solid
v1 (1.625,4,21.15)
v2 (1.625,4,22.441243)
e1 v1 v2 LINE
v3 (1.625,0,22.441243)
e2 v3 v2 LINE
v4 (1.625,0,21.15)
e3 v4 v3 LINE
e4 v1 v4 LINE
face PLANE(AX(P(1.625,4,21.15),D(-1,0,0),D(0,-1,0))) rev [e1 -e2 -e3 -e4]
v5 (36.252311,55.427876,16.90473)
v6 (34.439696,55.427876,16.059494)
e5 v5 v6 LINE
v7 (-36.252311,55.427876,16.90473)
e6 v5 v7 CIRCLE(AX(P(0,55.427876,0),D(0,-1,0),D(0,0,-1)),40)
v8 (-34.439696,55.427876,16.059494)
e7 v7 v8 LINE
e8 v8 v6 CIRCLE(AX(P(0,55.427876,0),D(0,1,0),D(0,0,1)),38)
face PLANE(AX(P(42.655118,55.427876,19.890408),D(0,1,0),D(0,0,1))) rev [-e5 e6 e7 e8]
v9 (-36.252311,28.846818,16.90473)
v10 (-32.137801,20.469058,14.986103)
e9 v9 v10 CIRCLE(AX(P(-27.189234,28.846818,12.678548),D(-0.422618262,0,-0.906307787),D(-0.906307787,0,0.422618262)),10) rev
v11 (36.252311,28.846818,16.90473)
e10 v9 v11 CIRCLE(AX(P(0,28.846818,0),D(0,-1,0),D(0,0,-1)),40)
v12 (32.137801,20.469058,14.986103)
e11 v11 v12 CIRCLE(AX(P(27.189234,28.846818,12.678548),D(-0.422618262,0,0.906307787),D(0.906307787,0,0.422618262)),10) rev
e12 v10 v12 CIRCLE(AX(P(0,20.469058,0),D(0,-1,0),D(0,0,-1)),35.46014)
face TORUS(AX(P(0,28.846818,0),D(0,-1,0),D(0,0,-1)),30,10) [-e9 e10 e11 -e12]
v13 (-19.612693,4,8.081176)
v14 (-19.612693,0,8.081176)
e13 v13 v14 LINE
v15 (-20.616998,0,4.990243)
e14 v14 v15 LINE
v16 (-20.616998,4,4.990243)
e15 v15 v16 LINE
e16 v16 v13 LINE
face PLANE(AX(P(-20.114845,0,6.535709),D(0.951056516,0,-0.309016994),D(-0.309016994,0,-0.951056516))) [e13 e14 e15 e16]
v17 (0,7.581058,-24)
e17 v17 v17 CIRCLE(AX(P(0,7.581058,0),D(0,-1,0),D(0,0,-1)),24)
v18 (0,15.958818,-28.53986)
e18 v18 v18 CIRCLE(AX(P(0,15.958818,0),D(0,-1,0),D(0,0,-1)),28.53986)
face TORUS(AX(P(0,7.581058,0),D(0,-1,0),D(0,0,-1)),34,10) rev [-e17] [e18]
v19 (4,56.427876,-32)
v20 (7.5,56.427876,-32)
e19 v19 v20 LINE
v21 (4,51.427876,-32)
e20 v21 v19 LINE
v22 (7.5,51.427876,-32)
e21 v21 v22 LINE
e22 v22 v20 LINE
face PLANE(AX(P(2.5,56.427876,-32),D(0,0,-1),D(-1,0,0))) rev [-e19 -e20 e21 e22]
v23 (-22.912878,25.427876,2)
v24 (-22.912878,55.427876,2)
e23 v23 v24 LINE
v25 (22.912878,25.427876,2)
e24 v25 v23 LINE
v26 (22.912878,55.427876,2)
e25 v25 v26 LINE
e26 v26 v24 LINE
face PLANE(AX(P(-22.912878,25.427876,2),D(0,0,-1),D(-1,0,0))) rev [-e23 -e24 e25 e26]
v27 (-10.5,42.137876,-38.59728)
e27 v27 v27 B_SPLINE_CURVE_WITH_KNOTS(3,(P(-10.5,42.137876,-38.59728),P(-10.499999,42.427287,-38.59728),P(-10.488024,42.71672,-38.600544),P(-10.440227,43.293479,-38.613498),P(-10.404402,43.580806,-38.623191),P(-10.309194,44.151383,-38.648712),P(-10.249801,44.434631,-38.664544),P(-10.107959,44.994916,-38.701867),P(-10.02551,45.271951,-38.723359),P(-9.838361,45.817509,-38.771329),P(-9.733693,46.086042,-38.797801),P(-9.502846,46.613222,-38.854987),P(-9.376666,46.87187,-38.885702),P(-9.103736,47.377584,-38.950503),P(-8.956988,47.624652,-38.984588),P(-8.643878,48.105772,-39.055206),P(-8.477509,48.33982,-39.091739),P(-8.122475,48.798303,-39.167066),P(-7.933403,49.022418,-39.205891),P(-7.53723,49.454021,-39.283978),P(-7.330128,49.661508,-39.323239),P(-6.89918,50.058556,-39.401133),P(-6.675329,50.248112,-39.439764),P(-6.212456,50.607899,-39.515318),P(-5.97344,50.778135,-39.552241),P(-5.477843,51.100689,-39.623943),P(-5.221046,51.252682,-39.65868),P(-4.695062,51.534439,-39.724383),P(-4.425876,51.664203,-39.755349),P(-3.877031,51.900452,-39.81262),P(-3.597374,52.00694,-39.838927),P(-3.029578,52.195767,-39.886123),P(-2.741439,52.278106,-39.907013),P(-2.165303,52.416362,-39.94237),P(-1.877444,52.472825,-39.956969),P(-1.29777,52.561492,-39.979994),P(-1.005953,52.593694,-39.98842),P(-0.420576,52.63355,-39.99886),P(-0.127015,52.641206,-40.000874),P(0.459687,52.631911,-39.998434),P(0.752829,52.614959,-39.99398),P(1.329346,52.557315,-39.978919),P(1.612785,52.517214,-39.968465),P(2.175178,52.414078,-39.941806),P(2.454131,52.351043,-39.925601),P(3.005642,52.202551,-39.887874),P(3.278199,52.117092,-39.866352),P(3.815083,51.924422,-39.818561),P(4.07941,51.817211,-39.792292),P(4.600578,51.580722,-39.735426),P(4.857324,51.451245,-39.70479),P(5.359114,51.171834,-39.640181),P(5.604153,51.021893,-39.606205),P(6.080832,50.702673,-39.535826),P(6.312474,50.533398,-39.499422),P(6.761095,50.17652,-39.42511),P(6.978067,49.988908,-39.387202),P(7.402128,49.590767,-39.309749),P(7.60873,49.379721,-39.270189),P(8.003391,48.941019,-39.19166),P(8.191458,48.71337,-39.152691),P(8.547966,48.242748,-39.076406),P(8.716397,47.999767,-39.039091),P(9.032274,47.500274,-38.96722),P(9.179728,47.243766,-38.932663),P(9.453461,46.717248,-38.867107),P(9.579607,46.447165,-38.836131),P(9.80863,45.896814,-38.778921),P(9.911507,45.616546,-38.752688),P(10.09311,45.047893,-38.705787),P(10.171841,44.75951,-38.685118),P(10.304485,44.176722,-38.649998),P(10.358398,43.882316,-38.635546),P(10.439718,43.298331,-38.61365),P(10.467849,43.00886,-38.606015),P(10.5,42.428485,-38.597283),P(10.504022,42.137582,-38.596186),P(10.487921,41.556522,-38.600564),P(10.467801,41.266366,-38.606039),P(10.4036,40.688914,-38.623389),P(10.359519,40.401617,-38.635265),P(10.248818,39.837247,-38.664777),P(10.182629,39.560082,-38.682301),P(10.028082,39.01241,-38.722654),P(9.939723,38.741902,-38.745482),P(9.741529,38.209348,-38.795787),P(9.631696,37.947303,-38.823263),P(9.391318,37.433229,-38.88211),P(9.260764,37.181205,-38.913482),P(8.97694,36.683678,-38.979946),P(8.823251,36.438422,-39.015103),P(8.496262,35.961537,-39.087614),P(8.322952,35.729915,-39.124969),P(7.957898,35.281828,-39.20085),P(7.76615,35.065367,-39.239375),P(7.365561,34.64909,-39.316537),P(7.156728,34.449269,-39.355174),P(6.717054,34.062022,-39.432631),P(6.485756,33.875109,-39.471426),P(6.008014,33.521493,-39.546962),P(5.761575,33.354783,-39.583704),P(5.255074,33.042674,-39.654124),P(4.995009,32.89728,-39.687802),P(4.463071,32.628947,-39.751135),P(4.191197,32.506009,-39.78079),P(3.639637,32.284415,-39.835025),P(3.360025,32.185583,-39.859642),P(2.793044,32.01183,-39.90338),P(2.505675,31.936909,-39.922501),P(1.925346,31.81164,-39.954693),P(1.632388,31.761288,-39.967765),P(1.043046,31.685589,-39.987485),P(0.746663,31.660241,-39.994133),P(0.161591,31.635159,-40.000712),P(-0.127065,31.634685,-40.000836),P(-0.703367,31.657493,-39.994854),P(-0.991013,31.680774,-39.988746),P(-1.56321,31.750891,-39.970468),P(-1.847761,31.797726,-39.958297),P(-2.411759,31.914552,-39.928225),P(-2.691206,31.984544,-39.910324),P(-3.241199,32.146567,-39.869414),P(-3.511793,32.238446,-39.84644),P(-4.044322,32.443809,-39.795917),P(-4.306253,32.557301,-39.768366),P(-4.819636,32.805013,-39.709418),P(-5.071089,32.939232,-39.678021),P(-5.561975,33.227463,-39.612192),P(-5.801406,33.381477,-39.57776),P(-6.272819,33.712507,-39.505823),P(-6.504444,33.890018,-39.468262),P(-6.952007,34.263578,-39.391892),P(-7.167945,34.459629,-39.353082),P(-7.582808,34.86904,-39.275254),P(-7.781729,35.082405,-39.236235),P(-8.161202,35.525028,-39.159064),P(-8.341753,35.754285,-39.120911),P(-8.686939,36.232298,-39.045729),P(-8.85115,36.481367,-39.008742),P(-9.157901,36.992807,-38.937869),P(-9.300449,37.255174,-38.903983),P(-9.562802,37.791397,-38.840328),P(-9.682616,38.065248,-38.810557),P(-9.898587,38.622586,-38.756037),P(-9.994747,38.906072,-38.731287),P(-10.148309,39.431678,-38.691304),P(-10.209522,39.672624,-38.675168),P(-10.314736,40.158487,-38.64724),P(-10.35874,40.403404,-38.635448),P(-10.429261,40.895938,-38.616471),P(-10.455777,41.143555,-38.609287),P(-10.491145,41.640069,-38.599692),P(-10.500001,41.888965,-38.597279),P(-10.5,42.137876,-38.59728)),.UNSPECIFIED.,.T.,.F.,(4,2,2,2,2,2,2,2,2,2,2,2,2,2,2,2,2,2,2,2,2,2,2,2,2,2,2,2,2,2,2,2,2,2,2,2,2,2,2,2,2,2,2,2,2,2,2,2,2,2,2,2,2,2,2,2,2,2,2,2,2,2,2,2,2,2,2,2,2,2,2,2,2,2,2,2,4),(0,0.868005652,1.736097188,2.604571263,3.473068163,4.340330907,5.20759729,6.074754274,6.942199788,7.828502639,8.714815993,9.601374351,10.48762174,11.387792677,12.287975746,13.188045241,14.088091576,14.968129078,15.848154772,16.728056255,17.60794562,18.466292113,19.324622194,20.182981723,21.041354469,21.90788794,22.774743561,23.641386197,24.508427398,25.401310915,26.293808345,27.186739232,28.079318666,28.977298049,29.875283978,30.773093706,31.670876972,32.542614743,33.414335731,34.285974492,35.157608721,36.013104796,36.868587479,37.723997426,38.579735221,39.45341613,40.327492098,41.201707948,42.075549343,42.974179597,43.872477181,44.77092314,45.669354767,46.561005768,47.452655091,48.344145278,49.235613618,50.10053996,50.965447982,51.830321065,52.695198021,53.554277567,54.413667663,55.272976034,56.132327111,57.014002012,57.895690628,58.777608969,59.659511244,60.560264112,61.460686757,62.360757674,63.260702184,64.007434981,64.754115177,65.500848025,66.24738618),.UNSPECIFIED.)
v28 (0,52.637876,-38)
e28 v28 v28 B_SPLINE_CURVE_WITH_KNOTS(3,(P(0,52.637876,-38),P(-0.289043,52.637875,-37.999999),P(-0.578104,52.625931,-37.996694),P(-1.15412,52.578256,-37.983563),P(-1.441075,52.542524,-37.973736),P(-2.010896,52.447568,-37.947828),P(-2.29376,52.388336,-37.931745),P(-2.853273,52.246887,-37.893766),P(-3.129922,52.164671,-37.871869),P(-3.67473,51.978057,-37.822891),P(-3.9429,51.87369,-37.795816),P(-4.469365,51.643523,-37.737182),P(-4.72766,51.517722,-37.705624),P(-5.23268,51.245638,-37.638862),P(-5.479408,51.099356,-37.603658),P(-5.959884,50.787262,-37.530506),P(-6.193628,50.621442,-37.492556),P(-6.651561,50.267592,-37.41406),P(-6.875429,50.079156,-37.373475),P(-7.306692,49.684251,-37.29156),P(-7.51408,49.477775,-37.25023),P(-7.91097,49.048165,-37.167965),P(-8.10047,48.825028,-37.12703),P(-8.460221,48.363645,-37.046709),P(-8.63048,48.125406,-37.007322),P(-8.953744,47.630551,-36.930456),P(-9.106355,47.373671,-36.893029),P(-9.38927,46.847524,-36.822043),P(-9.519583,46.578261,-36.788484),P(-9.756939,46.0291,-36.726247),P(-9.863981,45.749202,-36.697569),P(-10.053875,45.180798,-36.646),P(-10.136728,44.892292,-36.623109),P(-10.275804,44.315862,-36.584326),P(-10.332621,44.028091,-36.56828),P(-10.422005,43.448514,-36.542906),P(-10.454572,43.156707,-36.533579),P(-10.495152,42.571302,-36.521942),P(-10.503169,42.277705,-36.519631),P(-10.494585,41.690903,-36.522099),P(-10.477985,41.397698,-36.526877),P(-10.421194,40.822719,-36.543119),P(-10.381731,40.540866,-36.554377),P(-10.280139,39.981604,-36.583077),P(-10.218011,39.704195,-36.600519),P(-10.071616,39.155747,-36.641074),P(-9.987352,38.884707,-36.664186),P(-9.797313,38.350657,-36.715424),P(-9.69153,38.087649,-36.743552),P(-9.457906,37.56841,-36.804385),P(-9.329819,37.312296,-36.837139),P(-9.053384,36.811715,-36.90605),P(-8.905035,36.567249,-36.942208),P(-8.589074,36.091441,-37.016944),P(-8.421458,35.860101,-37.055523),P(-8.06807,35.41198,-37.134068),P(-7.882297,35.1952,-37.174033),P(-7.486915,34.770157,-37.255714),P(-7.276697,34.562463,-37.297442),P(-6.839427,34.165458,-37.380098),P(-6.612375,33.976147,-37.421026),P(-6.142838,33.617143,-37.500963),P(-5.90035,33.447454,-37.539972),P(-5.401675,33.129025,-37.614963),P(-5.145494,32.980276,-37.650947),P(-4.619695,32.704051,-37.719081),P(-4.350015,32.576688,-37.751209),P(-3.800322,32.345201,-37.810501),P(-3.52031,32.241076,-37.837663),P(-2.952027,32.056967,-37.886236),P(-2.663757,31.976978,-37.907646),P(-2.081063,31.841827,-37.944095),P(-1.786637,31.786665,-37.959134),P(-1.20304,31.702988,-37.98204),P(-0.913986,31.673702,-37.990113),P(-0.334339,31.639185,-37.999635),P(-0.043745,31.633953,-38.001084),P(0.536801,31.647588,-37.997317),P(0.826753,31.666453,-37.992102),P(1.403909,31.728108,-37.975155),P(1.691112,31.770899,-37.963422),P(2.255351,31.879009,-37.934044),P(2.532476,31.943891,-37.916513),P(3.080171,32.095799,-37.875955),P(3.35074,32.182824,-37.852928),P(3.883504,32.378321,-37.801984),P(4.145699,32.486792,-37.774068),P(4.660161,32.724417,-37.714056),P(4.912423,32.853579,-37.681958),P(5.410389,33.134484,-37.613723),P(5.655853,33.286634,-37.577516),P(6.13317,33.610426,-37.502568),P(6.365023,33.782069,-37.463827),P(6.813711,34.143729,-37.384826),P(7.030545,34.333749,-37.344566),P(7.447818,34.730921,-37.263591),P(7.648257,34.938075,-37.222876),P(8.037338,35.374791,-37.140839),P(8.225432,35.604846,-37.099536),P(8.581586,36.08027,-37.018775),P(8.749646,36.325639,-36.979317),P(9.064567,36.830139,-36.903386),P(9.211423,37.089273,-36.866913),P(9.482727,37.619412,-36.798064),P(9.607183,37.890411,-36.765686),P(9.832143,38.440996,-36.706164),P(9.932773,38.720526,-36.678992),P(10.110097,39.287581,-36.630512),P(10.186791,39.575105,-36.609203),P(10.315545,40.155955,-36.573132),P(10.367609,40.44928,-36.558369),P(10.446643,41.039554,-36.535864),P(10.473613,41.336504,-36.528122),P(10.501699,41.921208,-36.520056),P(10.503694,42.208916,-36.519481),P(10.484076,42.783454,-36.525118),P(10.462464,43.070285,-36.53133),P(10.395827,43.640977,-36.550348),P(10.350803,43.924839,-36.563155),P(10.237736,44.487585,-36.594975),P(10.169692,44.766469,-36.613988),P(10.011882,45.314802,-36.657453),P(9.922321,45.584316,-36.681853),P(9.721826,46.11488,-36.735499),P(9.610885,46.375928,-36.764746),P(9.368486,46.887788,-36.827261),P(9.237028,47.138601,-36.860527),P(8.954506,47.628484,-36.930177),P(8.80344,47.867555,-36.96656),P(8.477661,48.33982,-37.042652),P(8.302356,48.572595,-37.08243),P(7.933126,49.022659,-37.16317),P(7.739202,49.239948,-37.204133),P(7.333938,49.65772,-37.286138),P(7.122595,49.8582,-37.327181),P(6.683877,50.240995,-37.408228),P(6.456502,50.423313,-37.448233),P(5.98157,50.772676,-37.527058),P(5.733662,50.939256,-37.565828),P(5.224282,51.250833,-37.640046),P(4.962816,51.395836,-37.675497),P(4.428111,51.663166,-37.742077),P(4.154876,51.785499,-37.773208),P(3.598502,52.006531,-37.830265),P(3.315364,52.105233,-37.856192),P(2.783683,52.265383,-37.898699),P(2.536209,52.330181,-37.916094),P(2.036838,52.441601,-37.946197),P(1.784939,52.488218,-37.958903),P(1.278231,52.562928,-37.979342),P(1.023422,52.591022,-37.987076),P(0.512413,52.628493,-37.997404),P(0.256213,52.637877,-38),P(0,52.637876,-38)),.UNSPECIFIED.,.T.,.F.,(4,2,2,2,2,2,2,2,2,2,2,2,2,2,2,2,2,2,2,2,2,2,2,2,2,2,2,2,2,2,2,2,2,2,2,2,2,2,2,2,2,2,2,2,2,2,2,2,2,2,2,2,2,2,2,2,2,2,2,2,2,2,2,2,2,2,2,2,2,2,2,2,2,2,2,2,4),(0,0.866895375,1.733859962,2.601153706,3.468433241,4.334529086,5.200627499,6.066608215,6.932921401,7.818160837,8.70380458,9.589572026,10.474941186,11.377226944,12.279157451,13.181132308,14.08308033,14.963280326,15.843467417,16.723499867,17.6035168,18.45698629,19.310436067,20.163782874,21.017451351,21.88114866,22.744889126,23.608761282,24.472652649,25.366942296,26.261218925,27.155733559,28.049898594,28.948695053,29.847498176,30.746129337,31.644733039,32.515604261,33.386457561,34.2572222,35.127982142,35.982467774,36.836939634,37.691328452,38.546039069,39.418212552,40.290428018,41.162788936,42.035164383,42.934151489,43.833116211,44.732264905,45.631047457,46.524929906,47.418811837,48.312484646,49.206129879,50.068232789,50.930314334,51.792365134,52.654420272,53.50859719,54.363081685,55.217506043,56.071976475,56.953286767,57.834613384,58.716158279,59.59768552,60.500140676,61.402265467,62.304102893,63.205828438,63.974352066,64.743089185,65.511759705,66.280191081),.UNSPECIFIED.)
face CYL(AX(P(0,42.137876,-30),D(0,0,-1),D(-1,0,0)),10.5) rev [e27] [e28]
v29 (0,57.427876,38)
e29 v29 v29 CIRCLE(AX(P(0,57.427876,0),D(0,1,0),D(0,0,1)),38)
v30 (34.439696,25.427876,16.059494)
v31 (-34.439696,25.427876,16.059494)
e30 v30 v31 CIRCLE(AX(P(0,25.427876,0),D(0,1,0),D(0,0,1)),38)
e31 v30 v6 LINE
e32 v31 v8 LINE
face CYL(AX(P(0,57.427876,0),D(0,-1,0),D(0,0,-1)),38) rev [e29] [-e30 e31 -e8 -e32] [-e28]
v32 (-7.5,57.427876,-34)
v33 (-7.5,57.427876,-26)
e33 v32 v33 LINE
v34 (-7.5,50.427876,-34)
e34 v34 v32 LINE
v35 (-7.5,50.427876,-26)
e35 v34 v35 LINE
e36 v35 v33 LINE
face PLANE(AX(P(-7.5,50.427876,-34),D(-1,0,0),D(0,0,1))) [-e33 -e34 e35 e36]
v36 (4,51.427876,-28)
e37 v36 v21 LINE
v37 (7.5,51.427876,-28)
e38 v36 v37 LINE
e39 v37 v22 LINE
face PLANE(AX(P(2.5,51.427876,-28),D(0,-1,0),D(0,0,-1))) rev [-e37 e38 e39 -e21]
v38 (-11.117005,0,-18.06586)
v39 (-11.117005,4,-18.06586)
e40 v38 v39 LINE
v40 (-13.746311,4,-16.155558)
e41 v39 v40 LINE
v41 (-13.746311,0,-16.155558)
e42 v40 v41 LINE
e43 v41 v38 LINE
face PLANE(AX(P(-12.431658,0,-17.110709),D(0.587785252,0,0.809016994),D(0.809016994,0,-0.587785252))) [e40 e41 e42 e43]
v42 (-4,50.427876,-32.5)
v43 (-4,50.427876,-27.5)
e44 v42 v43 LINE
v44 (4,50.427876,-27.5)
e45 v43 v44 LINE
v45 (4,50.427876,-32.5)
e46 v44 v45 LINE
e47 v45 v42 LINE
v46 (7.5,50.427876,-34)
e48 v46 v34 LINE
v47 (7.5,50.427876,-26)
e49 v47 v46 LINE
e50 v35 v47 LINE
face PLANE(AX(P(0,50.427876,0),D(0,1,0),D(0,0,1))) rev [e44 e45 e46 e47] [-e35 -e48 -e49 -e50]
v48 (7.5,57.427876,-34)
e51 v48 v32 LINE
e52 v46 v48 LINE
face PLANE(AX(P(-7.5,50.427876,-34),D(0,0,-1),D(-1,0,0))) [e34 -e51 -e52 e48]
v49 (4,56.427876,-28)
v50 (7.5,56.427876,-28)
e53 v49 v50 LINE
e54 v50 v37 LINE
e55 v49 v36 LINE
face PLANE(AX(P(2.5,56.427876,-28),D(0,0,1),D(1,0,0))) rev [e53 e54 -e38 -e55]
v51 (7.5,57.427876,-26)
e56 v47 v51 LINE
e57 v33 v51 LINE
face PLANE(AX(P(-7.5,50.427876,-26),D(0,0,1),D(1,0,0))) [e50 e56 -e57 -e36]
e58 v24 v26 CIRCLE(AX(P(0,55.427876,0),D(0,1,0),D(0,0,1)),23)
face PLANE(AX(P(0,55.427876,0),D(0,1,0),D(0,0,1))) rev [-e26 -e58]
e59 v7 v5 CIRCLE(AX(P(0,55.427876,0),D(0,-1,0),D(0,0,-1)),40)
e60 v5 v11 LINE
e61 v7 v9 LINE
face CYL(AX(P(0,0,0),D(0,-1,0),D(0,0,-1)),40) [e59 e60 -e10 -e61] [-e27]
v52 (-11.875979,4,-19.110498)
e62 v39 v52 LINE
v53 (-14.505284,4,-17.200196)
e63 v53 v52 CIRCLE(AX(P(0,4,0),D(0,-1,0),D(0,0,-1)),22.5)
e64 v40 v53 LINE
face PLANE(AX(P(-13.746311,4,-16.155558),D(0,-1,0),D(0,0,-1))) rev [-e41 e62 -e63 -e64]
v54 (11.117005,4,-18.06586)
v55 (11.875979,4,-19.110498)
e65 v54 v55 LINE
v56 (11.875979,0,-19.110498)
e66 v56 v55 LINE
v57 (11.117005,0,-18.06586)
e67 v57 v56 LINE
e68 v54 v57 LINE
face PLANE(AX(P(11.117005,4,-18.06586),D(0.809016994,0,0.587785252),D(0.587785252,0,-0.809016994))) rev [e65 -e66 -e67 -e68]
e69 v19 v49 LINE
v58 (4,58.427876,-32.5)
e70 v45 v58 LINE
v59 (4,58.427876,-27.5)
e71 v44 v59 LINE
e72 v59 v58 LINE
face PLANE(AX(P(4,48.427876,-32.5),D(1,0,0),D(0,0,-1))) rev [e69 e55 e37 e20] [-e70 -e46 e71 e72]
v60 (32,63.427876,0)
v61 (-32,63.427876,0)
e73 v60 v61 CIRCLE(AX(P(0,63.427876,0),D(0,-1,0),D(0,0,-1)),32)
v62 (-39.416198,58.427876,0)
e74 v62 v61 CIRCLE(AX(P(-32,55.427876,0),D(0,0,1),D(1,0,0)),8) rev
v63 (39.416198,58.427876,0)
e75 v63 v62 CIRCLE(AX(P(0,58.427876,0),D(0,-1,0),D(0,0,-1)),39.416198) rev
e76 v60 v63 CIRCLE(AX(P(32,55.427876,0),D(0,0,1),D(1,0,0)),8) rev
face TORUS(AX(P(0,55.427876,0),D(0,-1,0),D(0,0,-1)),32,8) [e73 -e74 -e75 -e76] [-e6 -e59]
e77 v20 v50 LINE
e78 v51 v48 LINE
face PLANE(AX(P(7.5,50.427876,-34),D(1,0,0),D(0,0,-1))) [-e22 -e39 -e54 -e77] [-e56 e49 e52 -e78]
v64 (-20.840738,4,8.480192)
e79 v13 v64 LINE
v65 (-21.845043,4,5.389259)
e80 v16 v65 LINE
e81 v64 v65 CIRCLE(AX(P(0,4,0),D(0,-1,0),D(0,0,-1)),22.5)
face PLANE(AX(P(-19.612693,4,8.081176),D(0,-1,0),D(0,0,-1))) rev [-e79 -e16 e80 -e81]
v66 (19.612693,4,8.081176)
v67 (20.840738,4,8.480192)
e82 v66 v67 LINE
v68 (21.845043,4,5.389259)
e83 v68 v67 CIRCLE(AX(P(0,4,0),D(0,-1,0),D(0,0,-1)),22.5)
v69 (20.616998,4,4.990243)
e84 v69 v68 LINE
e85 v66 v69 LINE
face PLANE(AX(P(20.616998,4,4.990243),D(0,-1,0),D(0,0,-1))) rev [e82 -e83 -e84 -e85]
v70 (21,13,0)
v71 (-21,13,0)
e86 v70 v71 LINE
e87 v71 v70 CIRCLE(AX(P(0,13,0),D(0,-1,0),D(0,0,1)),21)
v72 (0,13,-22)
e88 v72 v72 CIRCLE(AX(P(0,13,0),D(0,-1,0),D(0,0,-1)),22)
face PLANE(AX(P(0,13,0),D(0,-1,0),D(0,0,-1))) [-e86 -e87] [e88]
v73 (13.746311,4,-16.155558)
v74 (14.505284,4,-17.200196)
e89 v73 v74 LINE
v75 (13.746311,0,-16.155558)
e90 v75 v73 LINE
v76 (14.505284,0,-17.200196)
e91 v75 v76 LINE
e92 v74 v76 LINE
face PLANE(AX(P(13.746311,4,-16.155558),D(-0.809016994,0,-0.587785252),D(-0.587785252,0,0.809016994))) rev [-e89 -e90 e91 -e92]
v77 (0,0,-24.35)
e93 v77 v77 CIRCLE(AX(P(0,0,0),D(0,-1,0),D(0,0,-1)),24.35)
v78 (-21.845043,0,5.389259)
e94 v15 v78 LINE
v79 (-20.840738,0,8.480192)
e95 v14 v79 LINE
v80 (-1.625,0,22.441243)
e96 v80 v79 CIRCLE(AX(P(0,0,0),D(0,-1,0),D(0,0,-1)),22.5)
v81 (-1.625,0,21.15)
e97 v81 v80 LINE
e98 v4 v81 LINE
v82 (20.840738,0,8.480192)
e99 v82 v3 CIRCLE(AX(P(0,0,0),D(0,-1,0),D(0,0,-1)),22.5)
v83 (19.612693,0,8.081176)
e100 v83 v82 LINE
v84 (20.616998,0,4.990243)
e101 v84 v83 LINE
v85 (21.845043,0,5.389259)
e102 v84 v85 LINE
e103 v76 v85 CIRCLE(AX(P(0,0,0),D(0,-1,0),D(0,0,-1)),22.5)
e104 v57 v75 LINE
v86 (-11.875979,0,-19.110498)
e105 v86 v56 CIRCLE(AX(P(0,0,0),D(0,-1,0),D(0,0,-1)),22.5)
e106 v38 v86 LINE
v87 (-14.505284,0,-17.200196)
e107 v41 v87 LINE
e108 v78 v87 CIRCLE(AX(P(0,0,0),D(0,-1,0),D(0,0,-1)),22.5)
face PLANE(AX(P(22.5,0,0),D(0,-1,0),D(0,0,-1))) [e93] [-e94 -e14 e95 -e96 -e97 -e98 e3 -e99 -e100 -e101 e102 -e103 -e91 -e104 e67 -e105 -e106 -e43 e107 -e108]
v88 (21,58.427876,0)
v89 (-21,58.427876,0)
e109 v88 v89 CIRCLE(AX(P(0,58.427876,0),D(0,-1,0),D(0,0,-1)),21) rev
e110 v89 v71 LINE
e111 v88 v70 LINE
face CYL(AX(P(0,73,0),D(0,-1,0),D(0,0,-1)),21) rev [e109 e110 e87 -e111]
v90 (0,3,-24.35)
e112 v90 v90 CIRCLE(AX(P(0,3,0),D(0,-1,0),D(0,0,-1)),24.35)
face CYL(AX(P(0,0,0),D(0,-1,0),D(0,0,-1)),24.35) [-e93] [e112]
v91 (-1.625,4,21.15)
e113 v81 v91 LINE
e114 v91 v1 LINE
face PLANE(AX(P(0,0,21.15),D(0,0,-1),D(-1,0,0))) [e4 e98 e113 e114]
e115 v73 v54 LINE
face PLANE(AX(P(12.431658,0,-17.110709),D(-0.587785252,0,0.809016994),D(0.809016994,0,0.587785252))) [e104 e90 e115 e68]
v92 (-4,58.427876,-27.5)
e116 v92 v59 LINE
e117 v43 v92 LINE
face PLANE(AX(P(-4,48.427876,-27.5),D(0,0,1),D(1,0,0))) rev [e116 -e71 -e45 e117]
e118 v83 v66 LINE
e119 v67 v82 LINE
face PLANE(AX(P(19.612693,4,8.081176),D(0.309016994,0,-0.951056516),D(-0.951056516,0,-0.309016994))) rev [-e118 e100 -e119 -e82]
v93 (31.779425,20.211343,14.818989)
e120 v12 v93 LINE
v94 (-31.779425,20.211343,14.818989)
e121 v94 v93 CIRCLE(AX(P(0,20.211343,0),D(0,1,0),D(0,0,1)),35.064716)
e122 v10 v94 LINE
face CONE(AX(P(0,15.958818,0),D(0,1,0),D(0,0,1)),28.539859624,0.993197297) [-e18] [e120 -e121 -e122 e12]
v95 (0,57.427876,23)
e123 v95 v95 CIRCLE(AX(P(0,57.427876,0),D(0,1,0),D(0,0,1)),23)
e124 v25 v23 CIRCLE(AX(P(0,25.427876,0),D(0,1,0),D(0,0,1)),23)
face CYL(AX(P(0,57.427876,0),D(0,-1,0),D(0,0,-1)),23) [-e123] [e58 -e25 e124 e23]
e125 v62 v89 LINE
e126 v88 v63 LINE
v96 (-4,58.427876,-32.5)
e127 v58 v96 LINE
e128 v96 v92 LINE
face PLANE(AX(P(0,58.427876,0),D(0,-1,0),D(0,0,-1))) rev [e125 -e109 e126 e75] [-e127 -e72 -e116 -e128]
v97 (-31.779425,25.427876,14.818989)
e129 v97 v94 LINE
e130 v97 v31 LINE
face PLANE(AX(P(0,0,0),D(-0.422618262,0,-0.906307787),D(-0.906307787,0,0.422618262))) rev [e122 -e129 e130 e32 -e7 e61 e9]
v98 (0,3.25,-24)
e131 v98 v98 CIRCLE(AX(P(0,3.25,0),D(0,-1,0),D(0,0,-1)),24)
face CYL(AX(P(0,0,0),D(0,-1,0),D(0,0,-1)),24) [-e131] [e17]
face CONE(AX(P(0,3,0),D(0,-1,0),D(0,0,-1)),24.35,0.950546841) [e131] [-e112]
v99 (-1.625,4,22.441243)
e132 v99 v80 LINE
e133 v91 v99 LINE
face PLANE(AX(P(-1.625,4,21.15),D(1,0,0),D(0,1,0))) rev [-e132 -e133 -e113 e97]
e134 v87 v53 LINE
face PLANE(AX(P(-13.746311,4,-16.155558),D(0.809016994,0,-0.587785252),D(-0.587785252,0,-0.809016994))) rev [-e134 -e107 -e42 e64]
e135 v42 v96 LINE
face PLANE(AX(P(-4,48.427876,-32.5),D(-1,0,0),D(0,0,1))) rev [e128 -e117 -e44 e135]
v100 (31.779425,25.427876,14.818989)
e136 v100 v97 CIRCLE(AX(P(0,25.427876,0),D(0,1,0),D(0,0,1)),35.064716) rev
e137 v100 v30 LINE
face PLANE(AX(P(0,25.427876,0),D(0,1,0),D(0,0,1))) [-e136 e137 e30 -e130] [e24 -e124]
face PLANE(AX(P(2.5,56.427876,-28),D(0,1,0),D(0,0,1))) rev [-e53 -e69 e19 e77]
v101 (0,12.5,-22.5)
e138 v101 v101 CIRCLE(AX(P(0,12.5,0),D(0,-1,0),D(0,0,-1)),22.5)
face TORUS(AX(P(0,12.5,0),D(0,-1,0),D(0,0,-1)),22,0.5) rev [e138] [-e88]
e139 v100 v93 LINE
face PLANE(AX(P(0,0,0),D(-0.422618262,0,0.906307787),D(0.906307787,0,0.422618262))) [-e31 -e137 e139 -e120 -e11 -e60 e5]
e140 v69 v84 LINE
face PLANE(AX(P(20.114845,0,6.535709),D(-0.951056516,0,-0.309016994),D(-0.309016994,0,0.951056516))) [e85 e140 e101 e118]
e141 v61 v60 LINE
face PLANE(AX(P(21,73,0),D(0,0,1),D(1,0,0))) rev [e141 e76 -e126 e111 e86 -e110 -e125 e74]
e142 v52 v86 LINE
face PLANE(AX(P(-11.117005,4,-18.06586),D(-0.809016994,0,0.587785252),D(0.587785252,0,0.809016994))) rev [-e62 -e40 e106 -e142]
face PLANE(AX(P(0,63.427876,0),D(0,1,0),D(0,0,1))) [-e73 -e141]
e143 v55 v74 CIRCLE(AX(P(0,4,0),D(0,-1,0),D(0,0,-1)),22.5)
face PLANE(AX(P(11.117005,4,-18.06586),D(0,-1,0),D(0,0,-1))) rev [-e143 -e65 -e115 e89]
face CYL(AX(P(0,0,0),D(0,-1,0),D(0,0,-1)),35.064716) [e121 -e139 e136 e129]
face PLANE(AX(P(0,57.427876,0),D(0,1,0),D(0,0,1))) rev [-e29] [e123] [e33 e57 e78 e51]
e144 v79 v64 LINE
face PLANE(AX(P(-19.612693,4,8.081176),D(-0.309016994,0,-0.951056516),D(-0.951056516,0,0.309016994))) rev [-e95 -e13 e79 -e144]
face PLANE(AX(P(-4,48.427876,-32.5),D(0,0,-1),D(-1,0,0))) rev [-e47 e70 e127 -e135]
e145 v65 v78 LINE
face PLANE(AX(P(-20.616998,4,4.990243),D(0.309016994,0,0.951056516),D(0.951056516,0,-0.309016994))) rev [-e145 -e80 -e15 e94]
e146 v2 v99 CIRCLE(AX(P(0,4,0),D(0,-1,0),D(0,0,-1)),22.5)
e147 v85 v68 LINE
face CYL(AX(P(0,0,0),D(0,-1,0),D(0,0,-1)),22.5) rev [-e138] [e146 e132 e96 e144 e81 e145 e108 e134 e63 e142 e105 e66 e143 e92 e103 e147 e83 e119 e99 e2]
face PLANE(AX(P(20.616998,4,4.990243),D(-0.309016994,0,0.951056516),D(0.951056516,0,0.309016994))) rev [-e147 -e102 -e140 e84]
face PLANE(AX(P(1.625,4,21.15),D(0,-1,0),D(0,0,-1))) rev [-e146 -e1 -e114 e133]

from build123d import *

# Parameters (mm, degrees)
CUT_EXTRUDE3_DEPTH           = 60
CUT_EXTRUDE5_DEPTH           = 2
CUT_EXTRUDE5_DEPTH_BACK      = 30
SKETCH9_R                    = 38
SKETCH9_R_2                  = 23
SKETCH19_W                   = 12
SKETCH19_H                   = 36.5
CUT_REVOLVE2_ANGLE           = 65
CUT_REVOLVE2_OTHER_WAY_ANGLE = 65
SKETCH21_W                   = 3.25
SKETCH21_H                   = 4
BOSS_EXTRUDE3_DEPTH          = 1.35
CIRPATTERN1_COUNT            = 5
CUT_EXTRUDE9_START           = -5
CUT_EXTRUDE9_DEPTH           = 5
SKETCH23_R                   = 10.5
CUT_EXTRUDE10_DEPTH          = 10
SKETCH24_W                   = 15
SKETCH24_H                   = 8
BOSS_EXTRUDE4_DEPTH          = 8
SKETCH26_W                   = 8
SKETCH26_H                   = 5
CUT_EXTRUDE11_DEPTH          = 10
SKETCH27_W                   = 4
SKETCH27_H                   = 5
CUT_EXTRUDE12_DEPTH          = 5
CUT_EXTRUDE14_DEPTH          = 30


with BuildPart() as part:
    # Sketch1 → Revolve1 (revolve)
    with BuildSketch(Plane.XY):
        with BuildLine():
            Line((0, 63.427876097), (32, 63.427876097))
            ThreePointArc((32, 63.427876097), (37.656854249, 61.084730346), (40, 55.427876097))
            Line((40, 55.427876097), (40, 28.846818009))
            ThreePointArc((40, 28.846818009), (38.792081772, 24.082439968), (35.460140376, 20.469057744))
            Line((35.460140376, 20.469057744), (28.539859624, 15.958818353))
            ThreePointArc((28.539859624, 15.958818353), (25.207918228, 12.345436129), (24, 7.581058088))
            Line((24, 7.581058088), (24, 3.25))
            Line((24, 3.25), (24.35, 3))
            Line((24.35, 3), (24.35, 0))
            Line((24.35, 0), (22.5, 0))
            Line((22.5, 0), (22.5, 12.5))
            ThreePointArc((22.5, 12.5), (22.353553391, 12.853553391), (22, 13))
            Line((22, 13), (0, 13))
            Line((0, 13), (0, 63.427876097))
        make_face()
    revolve(axis=Axis((0, 0, 0), (0, 1, 0)))

    # Sketch11 → Cut-Extrude3 (cut)
    with BuildSketch(Plane(origin=(0, 13, 0), x_dir=(-1, 0, 0), z_dir=(0, -1, 0))):
        with BuildLine():
            Line((-21, 0), (21, 0))
            ThreePointArc((21, 0), (0, 21), (-21, 0))
        make_face()
    extrude(amount=-CUT_EXTRUDE3_DEPTH, mode=Mode.SUBTRACT)

    # Sketch9 → Cut-Extrude5 (cut, two sides: drawn at the far end of the back side and taken through both)
    with BuildSketch(Plane(origin=(0, 55.427876097, 0), x_dir=(1, 0, 0), z_dir=(0, 1, 0)).offset(-CUT_EXTRUDE5_DEPTH_BACK)):
        Circle(SKETCH9_R)
        Circle(SKETCH9_R_2, mode=Mode.SUBTRACT)
    extrude(amount=CUT_EXTRUDE5_DEPTH + CUT_EXTRUDE5_DEPTH_BACK, mode=Mode.SUBTRACT)

    # Sketch19 → Cut-Revolve2 (revolve, cut)
    with BuildSketch(Plane(origin=(0, 0, 0), x_dir=(0, 0, -1), z_dir=(1, 0, 0))):
        with Locations((-41.064715832, 37.177876097)):
            Rectangle(SKETCH19_W, SKETCH19_H)
    revolve(axis=Axis((0, 0, 0), (0, 1, 0)), revolution_arc=CUT_REVOLVE2_ANGLE, mode=Mode.SUBTRACT)

    # Sketch19 → Cut-Revolve2 other way (revolve, cut)
    with BuildSketch(Plane(origin=(0, 0, 0), x_dir=(0, 0, -1), z_dir=(1, 0, 0))):
        with Locations((-41.064715832, 37.177876097)):
            Rectangle(SKETCH19_W, SKETCH19_H)
    revolve(axis=Axis((0, 0, 0), (0, -1, 0)), revolution_arc=CUT_REVOLVE2_OTHER_WAY_ANGLE, mode=Mode.SUBTRACT)

    # Sketch21 → Boss-Extrude3 (add)
    with BuildSketch(Plane(origin=(0, 0, 22.5), x_dir=(-1, 0, 0), z_dir=(0, 0, -1))):
        with Locations((0, 2)):
            Rectangle(SKETCH21_W, SKETCH21_H)
    boss_extrude3 = extrude(amount=BOSS_EXTRUDE3_DEPTH)

    # CirPattern1: Boss-Extrude3 ×5 about axis
    cirpattern1_axis = Axis((0, 0, 0), (0, -1, 0))
    for i in range(1, CIRPATTERN1_COUNT):
        add(boss_extrude3.rotate(cirpattern1_axis, i * 360 / CIRPATTERN1_COUNT))

    # Sketch22 → Cut-Extrude9 (cut)
    with BuildSketch(Plane(origin=(0, 63.427876097, 0), x_dir=(1, 0, 0), z_dir=(0, 1, 0)).offset(CUT_EXTRUDE9_START)):
        with BuildLine():
            Line((-40, 0), (40, 0))
            ThreePointArc((40, 0), (0, 40), (-40, 0))
        make_face()
    extrude(amount=CUT_EXTRUDE9_DEPTH, mode=Mode.SUBTRACT)

    # Sketch23 → Cut-Extrude10 (cut)
    with BuildSketch(Plane(origin=(0, 0, -40), x_dir=(-1, 0, 0), z_dir=(0, 0, -1))):
        with Locations((0, 42.137876097)):
            Circle(SKETCH23_R)
    extrude(amount=-CUT_EXTRUDE10_DEPTH, mode=Mode.SUBTRACT)

    # Sketch24 → Boss-Extrude4 (add)
    with BuildSketch(Plane(origin=(0, 58.427876097, 0), x_dir=(1, 0, 0), z_dir=(0, 1, 0))):
        with Locations((0, 30)):
            Rectangle(SKETCH24_W, SKETCH24_H)
    extrude(amount=-BOSS_EXTRUDE4_DEPTH)

    # Sketch26 → Cut-Extrude11 (cut)
    with BuildSketch(Plane(origin=(0, 58.427876097, 0), x_dir=(1, 0, 0), z_dir=(0, 1, 0))):
        with Locations((0, 30)):
            Rectangle(SKETCH26_W, SKETCH26_H)
    extrude(amount=-CUT_EXTRUDE11_DEPTH, mode=Mode.SUBTRACT)

    # Sketch27 → Cut-Extrude12 (cut)
    with BuildSketch(Plane(origin=(7.5, 0, 0), x_dir=(0, 0, -1), z_dir=(1, 0, 0))):
        with Locations((30, 53.927876097)):
            Rectangle(SKETCH27_W, SKETCH27_H)
    extrude(amount=-CUT_EXTRUDE12_DEPTH, mode=Mode.SUBTRACT)

    # Sketch28 → Cut-Extrude14 (cut)
    with BuildSketch(Plane(origin=(0, 55.427876097, 0), x_dir=(1, 0, 0), z_dir=(0, 1, 0))):
        with BuildLine():
            Line((-22.912878475, -2), (22.912878475, -2))
            ThreePointArc((22.912878475, -2), (0, -23), (-22.912878475, -2))
        make_face()
    extrude(amount=-CUT_EXTRUDE14_DEPTH, mode=Mode.SUBTRACT)


solid = part.part
